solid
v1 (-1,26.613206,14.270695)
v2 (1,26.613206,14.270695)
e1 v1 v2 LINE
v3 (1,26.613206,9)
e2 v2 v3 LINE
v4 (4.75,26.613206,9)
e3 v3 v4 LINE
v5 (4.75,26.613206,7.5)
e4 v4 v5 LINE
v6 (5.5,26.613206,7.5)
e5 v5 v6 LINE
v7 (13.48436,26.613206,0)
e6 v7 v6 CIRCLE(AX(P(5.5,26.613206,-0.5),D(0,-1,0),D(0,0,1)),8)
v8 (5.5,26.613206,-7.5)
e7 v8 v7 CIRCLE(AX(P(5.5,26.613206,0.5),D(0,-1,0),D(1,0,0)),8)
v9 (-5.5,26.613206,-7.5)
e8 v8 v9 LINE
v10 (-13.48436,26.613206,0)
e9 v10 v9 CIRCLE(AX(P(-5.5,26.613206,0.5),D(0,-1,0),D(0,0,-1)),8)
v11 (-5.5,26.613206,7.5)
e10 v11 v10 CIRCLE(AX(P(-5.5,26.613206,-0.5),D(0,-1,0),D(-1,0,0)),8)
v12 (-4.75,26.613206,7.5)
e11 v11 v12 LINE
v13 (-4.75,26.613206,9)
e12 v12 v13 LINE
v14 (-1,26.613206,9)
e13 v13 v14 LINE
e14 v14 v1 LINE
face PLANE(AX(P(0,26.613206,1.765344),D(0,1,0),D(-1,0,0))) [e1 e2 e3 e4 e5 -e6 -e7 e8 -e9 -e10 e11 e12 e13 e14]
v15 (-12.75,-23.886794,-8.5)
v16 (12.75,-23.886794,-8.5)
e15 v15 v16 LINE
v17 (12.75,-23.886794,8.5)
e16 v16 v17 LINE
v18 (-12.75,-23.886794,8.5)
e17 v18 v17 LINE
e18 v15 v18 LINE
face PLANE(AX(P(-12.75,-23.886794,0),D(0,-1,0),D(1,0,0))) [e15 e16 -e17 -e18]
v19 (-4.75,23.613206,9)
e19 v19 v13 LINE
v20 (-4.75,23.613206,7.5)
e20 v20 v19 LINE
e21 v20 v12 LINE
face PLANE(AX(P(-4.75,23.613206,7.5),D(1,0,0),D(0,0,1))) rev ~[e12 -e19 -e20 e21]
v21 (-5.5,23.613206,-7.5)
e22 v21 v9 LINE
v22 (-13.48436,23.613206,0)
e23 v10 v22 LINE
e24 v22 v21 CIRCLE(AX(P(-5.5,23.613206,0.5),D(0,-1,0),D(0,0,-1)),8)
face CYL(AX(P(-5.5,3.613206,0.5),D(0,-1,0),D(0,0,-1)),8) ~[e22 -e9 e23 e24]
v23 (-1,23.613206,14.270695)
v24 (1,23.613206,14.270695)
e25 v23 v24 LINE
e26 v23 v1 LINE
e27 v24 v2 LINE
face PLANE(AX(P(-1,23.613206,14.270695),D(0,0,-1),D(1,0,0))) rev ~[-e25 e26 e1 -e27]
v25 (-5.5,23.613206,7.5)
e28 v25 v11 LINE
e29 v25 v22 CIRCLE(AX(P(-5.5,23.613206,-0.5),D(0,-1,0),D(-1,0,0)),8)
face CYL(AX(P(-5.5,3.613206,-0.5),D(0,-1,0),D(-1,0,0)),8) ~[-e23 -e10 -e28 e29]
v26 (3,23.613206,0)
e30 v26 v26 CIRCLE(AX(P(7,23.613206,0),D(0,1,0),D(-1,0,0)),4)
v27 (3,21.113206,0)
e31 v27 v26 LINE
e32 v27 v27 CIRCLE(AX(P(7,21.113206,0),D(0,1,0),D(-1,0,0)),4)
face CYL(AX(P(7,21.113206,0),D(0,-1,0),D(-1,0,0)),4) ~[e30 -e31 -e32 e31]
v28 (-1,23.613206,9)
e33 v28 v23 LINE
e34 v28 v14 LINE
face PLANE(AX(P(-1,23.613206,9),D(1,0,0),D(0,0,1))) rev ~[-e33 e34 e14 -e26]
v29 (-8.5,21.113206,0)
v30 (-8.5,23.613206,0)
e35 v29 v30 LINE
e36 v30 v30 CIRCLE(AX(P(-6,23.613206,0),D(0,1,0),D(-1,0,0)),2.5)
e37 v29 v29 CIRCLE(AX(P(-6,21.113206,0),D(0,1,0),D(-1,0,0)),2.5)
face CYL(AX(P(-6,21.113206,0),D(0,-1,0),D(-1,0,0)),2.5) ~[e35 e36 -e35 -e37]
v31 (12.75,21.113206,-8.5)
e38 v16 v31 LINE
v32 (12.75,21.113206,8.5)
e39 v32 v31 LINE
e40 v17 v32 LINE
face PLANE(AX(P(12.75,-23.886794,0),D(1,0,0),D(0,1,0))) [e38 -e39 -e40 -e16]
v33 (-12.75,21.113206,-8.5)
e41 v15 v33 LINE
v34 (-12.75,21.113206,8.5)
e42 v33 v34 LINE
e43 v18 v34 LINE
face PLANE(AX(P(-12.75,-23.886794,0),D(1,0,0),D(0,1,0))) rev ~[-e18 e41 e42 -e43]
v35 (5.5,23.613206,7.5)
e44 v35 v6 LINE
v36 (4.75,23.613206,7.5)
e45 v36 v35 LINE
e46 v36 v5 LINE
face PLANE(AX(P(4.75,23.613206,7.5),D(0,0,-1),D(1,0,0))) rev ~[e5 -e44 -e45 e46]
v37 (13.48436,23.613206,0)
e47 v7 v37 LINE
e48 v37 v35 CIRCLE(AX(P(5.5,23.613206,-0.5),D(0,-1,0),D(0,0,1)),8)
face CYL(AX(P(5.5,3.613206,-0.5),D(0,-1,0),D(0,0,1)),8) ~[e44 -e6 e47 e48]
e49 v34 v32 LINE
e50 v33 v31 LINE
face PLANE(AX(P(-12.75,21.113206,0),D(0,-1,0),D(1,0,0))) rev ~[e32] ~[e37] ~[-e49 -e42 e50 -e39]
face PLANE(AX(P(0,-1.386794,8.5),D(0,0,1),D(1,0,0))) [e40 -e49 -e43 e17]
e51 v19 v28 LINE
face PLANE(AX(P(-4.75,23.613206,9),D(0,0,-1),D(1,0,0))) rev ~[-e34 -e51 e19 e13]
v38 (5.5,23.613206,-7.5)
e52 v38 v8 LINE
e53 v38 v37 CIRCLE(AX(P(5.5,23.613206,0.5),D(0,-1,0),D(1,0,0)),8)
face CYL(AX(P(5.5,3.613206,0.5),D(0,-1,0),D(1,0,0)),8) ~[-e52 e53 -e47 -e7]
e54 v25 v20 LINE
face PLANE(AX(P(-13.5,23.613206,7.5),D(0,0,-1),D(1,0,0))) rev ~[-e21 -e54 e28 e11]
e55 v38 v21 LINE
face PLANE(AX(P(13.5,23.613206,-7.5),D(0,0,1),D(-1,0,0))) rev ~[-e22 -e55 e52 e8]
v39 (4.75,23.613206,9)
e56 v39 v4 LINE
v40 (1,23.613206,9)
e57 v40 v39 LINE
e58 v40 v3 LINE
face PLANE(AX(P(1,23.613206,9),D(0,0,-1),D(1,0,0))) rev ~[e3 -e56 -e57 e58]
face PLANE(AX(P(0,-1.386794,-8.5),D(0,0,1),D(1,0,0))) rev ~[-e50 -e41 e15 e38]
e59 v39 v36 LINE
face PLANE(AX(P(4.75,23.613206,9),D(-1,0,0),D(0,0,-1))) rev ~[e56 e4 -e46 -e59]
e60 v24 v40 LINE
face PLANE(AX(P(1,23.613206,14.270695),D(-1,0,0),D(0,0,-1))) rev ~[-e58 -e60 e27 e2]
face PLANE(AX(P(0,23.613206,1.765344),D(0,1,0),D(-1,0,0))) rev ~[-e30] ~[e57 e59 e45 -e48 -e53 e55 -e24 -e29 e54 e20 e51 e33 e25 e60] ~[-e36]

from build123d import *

# Parameters (mm, degrees)
F0_W         = 25.5
F0_H         = 45
F1_DEPTH     = 8.5
F2_R         = 2.5
F2_R_2       = 4
F3_DEPTH     = 2.5
F5_DEPTH     = 3
F6_T4_DEPTH  = 43
F6_T9_DEPTH  = 43
F6_T14_DEPTH = 43
F6_T19_DEPTH = 43


# Not quite as in the source:
# - a fillet or chamfer that OpenCascade refuses, or shapes differently, is made with other operations: its cross-section is extruded or revolved along the edge and cut away or added


with BuildPart() as f1:
    # F0 (on Top) → F1 (new body, symmetric)
    with BuildSketch(Plane.XY):
        with Locations((0, -1.3867942244)):
            Rectangle(F0_W, F0_H)
    extrude(amount=F1_DEPTH, both=True)

    # F2 (on face) → F3 (join)
    with BuildSketch(Plane(origin=(0, 21.1132057756, 0), x_dir=(-1, 0, 0), z_dir=(0, 1, 0))):
        with Locations((6, 0)):
            Circle(F2_R)
        with Locations((-7, 0)):
            Circle(F2_R_2)
    extrude(amount=F3_DEPTH)

    # F4 (on face) → F5 (join)
    with BuildSketch(Plane(origin=(0, 23.6132057756, 0), x_dir=(-1, 0, 0), z_dir=(0, 1, 0))):
        Polygon((-4.75, 7.5), (-13.5, 7.5), (-13.5, -7.5), (13.5, -7.5), (13.5, 7.5), (4.75, 7.5), (4.75, 9), (1, 9), (1, 14.2706949264), (-1, 14.2706949264), (-1, 9), (-4.75, 9), align=None)
    extrude(amount=F5_DEPTH)

    # F6: fillet of radius 8 on 4 edges, made by hand


with BuildPart() as f6_tool2:
    # F6_s3 → F6_t4 (new body)
    with BuildSketch(Plane.XZ.offset(-3.6132057756)):
        with BuildLine():
            ThreePointArc((5.5, 7.5), (11.1568542495, 5.1568542495), (13.5, -0.5))
            Line((13.5, -0.5), (13.5, 7.5))
            Line((13.5, 7.5), (5.5, 7.5))
        make_face()
    extrude(amount=-F6_T4_DEPTH)

    split(bisect_by=Plane.XZ.offset(-21.1132057756), keep=Keep.BOTTOM)


with BuildPart() as f1_1:
    add(f1.part)

    # F6_t1: cut F6_tool2
    add(f6_tool2.part, mode=Mode.SUBTRACT)


with BuildPart() as f6_tool7:
    # F6_s8 → F6_t9 (new body)
    with BuildSketch(Plane.XZ.offset(-3.6132057756)):
        with BuildLine():
            ThreePointArc((-13.5, -0.5), (-11.1568542495, 5.1568542495), (-5.5, 7.5))
            Line((-5.5, 7.5), (-13.5, 7.5))
            Line((-13.5, 7.5), (-13.5, -0.5))
        make_face()
    extrude(amount=-F6_T9_DEPTH)

    split(bisect_by=Plane.XZ.offset(-21.1132057756), keep=Keep.BOTTOM)


with BuildPart() as f1_2:
    add(f1_1.part)

    # F6_t6: cut F6_tool7
    add(f6_tool7.part, mode=Mode.SUBTRACT)


with BuildPart() as f6_tool12:
    # F6_s13 → F6_t14 (new body)
    with BuildSketch(Plane.XZ.offset(-3.6132057756)):
        with BuildLine():
            ThreePointArc((-5.5, -7.5), (-11.1568542495, -5.1568542495), (-13.5, 0.5))
            Line((-13.5, 0.5), (-13.5, -7.5))
            Line((-13.5, -7.5), (-5.5, -7.5))
        make_face()
    extrude(amount=-F6_T14_DEPTH)

    split(bisect_by=Plane.XZ.offset(-21.1132057756), keep=Keep.BOTTOM)


with BuildPart() as f1_3:
    add(f1_2.part)

    # F6_t11: cut F6_tool12
    add(f6_tool12.part, mode=Mode.SUBTRACT)


with BuildPart() as f6_tool17:
    # F6_s18 → F6_t19 (new body)
    with BuildSketch(Plane.XZ.offset(-3.6132057756)):
        with BuildLine():
            ThreePointArc((13.5, 0.5), (11.1568542495, -5.1568542495), (5.5, -7.5))
            Line((5.5, -7.5), (13.5, -7.5))
            Line((13.5, -7.5), (13.5, 0.5))
        make_face()
    extrude(amount=-F6_T19_DEPTH)

    split(bisect_by=Plane.XZ.offset(-21.1132057756), keep=Keep.BOTTOM)


with BuildPart() as f1_4:
    add(f1_3.part)

    # F6_t16: cut F6_tool17
    add(f6_tool17.part, mode=Mode.SUBTRACT)


solid = f1_4.part
